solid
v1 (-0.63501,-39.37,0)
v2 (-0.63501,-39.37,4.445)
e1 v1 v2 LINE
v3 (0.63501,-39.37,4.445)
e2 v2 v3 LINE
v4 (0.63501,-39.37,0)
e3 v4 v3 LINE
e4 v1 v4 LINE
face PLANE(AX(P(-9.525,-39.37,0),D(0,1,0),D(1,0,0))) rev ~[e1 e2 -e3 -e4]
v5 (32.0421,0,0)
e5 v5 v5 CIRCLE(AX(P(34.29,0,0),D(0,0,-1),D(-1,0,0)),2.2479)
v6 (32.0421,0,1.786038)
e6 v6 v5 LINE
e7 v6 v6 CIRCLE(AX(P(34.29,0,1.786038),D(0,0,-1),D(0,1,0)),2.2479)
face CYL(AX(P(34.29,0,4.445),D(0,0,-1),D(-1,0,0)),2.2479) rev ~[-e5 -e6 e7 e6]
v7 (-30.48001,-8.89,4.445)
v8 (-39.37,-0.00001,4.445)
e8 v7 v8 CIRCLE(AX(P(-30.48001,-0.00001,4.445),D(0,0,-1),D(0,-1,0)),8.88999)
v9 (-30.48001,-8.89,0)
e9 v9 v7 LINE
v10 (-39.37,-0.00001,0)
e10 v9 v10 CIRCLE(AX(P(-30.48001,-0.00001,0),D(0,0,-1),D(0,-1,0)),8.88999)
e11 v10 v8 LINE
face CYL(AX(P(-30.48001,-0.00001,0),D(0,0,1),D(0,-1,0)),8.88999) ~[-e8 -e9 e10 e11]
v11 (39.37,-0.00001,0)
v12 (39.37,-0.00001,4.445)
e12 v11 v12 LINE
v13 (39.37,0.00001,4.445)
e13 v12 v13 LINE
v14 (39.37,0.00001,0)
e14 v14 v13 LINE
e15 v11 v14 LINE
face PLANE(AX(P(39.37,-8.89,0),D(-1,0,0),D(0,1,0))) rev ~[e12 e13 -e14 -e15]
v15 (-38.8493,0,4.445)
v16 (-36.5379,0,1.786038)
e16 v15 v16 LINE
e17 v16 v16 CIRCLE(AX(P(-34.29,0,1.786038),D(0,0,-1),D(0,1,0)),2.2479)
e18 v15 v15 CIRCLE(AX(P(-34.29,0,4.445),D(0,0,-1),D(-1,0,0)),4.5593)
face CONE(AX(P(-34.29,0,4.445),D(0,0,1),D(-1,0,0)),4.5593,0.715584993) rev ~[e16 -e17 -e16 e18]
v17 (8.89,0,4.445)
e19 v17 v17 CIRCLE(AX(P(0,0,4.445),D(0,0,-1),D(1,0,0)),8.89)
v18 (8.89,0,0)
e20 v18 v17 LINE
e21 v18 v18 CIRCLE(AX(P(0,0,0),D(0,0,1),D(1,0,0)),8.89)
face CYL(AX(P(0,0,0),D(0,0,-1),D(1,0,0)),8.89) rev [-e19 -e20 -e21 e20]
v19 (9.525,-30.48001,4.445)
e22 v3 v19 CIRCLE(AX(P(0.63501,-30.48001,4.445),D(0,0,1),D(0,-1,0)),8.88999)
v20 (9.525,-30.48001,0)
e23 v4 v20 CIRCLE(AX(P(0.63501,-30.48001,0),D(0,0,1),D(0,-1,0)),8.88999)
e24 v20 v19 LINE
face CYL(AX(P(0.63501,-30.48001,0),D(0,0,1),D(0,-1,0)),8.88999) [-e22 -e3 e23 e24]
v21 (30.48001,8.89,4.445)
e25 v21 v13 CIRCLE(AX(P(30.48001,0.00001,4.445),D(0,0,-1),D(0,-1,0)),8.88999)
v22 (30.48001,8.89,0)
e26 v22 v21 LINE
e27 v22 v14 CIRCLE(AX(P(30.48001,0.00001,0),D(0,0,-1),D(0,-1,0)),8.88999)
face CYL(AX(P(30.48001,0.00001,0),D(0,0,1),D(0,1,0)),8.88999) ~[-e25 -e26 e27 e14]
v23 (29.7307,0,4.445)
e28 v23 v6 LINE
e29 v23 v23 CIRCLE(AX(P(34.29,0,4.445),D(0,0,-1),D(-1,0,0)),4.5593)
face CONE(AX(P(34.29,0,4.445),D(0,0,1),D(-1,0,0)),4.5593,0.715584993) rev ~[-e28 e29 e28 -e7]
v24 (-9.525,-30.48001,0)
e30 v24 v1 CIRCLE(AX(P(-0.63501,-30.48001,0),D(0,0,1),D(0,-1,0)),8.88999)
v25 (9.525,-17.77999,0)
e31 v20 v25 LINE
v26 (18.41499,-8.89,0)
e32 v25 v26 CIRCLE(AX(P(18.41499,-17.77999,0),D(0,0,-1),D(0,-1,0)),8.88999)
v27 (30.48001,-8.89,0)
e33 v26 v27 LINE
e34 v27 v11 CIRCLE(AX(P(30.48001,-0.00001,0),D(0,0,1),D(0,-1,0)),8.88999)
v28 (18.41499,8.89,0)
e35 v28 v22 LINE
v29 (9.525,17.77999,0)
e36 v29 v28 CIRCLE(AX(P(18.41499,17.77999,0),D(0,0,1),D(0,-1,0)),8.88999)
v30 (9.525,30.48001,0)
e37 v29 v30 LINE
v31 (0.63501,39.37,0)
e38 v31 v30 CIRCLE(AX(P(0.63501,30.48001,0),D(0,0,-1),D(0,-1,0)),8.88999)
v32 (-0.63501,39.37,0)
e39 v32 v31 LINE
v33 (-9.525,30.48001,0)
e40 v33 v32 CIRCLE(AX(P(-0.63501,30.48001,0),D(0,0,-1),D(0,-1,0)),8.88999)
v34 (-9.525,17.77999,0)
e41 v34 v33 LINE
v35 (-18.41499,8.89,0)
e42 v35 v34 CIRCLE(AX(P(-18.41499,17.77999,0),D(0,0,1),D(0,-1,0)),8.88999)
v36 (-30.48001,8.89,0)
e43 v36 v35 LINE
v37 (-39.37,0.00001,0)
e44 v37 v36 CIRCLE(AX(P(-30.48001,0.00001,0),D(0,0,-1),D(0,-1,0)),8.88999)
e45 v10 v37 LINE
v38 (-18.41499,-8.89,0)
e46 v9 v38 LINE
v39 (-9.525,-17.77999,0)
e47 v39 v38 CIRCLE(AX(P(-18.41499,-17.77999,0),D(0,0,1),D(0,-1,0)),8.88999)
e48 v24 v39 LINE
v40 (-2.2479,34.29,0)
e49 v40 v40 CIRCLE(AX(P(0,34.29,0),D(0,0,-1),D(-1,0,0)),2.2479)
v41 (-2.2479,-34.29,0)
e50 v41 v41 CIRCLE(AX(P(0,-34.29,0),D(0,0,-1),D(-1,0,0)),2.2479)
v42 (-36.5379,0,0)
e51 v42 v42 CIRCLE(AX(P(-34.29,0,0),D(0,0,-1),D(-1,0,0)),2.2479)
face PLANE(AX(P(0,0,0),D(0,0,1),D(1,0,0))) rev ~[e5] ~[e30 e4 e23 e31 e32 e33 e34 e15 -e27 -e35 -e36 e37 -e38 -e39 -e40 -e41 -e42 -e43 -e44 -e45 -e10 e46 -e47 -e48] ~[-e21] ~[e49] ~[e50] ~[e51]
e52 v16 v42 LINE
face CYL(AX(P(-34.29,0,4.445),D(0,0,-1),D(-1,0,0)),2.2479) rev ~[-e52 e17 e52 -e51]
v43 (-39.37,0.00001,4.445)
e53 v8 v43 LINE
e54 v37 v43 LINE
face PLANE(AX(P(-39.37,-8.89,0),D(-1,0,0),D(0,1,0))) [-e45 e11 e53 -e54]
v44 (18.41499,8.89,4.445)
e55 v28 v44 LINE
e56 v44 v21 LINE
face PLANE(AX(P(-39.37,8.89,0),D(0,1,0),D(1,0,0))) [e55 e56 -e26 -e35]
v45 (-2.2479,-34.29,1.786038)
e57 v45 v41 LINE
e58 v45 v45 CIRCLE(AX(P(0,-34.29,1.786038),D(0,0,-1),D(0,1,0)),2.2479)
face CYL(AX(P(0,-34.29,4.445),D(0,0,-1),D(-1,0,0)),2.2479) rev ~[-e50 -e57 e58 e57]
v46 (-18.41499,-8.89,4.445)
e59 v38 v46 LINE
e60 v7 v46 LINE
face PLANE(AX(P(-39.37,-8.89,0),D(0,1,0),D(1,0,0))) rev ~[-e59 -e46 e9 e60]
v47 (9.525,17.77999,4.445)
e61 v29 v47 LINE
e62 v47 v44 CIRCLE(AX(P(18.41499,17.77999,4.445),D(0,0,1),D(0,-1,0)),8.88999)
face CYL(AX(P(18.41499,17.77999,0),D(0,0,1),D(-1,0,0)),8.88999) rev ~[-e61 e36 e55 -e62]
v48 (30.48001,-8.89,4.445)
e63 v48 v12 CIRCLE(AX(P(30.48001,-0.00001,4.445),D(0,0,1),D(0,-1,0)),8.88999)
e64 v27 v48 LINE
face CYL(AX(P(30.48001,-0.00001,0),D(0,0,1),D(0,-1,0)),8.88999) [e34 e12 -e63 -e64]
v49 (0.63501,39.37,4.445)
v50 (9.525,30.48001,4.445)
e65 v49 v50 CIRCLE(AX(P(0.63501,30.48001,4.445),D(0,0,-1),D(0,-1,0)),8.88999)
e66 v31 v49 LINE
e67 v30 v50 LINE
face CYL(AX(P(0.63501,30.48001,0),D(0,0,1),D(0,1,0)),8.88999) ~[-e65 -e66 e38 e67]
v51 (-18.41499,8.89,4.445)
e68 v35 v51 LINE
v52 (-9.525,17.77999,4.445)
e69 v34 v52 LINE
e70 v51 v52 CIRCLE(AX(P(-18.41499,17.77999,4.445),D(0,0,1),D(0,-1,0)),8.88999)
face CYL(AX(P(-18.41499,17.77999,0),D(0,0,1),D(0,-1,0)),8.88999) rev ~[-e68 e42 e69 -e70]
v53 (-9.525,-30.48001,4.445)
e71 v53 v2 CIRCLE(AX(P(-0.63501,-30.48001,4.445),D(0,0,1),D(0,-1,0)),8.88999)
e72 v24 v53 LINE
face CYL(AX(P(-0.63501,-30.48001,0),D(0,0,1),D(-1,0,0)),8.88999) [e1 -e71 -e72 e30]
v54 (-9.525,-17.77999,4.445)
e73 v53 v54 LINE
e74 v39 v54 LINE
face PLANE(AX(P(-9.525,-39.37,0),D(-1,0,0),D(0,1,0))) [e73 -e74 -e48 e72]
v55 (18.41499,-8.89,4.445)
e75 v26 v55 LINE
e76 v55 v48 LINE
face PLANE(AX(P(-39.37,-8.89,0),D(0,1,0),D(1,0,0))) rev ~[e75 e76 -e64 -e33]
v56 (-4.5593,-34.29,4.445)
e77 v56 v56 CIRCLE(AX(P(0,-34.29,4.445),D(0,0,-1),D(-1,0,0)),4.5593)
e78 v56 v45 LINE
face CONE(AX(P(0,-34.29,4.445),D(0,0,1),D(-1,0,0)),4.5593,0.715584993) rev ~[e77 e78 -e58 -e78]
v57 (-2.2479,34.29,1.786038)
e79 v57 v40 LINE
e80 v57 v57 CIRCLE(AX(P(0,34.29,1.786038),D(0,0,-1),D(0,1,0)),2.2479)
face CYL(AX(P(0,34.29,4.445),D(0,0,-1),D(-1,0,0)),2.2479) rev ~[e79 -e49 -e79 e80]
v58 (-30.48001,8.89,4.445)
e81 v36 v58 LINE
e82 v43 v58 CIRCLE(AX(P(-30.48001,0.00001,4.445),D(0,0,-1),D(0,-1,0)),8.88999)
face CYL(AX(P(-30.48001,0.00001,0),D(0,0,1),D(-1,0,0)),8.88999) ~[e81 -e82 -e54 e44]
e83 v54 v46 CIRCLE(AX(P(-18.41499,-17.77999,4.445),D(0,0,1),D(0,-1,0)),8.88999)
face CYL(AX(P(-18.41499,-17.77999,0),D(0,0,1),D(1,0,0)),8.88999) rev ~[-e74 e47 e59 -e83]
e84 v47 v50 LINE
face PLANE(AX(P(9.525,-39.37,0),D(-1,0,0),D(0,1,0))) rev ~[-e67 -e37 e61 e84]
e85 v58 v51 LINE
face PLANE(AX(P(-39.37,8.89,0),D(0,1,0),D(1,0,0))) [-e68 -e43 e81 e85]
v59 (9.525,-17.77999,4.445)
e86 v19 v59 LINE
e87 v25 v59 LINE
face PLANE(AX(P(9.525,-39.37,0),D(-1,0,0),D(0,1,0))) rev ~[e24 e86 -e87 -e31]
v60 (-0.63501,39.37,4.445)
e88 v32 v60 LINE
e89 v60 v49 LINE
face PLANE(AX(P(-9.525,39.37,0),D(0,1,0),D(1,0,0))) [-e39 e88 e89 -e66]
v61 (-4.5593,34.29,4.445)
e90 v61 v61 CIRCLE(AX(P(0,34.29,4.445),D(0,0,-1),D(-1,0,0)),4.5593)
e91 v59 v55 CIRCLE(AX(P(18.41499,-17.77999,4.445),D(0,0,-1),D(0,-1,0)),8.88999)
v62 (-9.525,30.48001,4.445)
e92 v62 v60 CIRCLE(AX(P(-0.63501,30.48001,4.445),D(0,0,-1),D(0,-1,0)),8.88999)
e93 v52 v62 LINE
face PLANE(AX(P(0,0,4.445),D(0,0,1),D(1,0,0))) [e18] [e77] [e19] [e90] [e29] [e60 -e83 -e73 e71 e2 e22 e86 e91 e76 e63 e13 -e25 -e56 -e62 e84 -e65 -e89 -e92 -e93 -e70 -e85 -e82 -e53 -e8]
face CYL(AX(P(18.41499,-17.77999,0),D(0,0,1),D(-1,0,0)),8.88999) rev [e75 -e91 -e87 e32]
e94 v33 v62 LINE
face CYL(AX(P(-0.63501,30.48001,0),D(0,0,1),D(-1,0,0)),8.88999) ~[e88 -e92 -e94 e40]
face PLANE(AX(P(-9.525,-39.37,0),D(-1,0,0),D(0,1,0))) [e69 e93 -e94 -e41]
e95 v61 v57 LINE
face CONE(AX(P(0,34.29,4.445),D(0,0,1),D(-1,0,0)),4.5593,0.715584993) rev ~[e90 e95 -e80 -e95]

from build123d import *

# Parameters (mm, degrees)
F0_W           = 78.74
F0_H           = 17.78
F1_DEPTH       = 4.445
F2_W           = 19.05
F2_H           = 78.74
F3_DEPTH       = 4.445
F4_R           = 8.88999
F6_D           = 4.4958
F6_CSINK_D     = 9.1186
F6_CSINK_ANGLE = 82
F7_R           = 8.89
F8_DEPTH       = 4.446


# Not quite as in the source:
# - a fillet or chamfer is up to 0.001 mm smaller than in the source, because OpenCascade refuses the exact size


with BuildPart() as f1:
    # F0 (on Top) → F1 (new body)
    with BuildSketch(Plane.XY):
        Rectangle(F0_W, F0_H)
    extrude(amount=F1_DEPTH)

    # F2 (on Top) → F3 (join, through all)
    with BuildSketch(Plane.XY):
        Rectangle(F2_W, F2_H)
    extrude(amount=F3_DEPTH)

    # F4 (radius 8.89 in the source; OpenCascade refuses exactly that, so slightly less here)
    f4_edges = [f1.edges().sort_by_distance(p)[0] for p in [
        (9.525, -39.37, 2.2225),
        (-9.525, -39.37, 2.2225),
        (39.37, -8.89, 2.2225),
        (39.37, 8.89, 2.2225),
        (9.525, 39.37, 2.2225),
        (-39.37, -8.89, 2.2225),
        (-39.37, 8.89, 2.2225),
        (-9.525, 8.89, 2.2225),
        (-9.525, 39.37, 2.2225),
        (-9.525, -8.89, 2.2225),
        (9.525, -8.89, 2.2225),
        (9.525, 8.89, 2.2225),
    ]]
    fillet(f4_edges, radius=F4_R)

    # F6 (through all)
    with Locations(Plane.XY.offset(4.445)):
        with Locations((34.29, 0), (0, -34.29), (-34.29, 0), (0, 34.29)):
            CounterSinkHole(F6_D / 2, F6_CSINK_D / 2, counter_sink_angle=F6_CSINK_ANGLE)

    # F7 (on Top) → F8 (cut, through all)
    with BuildSketch(Plane.XY):
        Circle(F7_R)
    extrude(amount=F8_DEPTH, mode=Mode.SUBTRACT)


solid = f1.part
